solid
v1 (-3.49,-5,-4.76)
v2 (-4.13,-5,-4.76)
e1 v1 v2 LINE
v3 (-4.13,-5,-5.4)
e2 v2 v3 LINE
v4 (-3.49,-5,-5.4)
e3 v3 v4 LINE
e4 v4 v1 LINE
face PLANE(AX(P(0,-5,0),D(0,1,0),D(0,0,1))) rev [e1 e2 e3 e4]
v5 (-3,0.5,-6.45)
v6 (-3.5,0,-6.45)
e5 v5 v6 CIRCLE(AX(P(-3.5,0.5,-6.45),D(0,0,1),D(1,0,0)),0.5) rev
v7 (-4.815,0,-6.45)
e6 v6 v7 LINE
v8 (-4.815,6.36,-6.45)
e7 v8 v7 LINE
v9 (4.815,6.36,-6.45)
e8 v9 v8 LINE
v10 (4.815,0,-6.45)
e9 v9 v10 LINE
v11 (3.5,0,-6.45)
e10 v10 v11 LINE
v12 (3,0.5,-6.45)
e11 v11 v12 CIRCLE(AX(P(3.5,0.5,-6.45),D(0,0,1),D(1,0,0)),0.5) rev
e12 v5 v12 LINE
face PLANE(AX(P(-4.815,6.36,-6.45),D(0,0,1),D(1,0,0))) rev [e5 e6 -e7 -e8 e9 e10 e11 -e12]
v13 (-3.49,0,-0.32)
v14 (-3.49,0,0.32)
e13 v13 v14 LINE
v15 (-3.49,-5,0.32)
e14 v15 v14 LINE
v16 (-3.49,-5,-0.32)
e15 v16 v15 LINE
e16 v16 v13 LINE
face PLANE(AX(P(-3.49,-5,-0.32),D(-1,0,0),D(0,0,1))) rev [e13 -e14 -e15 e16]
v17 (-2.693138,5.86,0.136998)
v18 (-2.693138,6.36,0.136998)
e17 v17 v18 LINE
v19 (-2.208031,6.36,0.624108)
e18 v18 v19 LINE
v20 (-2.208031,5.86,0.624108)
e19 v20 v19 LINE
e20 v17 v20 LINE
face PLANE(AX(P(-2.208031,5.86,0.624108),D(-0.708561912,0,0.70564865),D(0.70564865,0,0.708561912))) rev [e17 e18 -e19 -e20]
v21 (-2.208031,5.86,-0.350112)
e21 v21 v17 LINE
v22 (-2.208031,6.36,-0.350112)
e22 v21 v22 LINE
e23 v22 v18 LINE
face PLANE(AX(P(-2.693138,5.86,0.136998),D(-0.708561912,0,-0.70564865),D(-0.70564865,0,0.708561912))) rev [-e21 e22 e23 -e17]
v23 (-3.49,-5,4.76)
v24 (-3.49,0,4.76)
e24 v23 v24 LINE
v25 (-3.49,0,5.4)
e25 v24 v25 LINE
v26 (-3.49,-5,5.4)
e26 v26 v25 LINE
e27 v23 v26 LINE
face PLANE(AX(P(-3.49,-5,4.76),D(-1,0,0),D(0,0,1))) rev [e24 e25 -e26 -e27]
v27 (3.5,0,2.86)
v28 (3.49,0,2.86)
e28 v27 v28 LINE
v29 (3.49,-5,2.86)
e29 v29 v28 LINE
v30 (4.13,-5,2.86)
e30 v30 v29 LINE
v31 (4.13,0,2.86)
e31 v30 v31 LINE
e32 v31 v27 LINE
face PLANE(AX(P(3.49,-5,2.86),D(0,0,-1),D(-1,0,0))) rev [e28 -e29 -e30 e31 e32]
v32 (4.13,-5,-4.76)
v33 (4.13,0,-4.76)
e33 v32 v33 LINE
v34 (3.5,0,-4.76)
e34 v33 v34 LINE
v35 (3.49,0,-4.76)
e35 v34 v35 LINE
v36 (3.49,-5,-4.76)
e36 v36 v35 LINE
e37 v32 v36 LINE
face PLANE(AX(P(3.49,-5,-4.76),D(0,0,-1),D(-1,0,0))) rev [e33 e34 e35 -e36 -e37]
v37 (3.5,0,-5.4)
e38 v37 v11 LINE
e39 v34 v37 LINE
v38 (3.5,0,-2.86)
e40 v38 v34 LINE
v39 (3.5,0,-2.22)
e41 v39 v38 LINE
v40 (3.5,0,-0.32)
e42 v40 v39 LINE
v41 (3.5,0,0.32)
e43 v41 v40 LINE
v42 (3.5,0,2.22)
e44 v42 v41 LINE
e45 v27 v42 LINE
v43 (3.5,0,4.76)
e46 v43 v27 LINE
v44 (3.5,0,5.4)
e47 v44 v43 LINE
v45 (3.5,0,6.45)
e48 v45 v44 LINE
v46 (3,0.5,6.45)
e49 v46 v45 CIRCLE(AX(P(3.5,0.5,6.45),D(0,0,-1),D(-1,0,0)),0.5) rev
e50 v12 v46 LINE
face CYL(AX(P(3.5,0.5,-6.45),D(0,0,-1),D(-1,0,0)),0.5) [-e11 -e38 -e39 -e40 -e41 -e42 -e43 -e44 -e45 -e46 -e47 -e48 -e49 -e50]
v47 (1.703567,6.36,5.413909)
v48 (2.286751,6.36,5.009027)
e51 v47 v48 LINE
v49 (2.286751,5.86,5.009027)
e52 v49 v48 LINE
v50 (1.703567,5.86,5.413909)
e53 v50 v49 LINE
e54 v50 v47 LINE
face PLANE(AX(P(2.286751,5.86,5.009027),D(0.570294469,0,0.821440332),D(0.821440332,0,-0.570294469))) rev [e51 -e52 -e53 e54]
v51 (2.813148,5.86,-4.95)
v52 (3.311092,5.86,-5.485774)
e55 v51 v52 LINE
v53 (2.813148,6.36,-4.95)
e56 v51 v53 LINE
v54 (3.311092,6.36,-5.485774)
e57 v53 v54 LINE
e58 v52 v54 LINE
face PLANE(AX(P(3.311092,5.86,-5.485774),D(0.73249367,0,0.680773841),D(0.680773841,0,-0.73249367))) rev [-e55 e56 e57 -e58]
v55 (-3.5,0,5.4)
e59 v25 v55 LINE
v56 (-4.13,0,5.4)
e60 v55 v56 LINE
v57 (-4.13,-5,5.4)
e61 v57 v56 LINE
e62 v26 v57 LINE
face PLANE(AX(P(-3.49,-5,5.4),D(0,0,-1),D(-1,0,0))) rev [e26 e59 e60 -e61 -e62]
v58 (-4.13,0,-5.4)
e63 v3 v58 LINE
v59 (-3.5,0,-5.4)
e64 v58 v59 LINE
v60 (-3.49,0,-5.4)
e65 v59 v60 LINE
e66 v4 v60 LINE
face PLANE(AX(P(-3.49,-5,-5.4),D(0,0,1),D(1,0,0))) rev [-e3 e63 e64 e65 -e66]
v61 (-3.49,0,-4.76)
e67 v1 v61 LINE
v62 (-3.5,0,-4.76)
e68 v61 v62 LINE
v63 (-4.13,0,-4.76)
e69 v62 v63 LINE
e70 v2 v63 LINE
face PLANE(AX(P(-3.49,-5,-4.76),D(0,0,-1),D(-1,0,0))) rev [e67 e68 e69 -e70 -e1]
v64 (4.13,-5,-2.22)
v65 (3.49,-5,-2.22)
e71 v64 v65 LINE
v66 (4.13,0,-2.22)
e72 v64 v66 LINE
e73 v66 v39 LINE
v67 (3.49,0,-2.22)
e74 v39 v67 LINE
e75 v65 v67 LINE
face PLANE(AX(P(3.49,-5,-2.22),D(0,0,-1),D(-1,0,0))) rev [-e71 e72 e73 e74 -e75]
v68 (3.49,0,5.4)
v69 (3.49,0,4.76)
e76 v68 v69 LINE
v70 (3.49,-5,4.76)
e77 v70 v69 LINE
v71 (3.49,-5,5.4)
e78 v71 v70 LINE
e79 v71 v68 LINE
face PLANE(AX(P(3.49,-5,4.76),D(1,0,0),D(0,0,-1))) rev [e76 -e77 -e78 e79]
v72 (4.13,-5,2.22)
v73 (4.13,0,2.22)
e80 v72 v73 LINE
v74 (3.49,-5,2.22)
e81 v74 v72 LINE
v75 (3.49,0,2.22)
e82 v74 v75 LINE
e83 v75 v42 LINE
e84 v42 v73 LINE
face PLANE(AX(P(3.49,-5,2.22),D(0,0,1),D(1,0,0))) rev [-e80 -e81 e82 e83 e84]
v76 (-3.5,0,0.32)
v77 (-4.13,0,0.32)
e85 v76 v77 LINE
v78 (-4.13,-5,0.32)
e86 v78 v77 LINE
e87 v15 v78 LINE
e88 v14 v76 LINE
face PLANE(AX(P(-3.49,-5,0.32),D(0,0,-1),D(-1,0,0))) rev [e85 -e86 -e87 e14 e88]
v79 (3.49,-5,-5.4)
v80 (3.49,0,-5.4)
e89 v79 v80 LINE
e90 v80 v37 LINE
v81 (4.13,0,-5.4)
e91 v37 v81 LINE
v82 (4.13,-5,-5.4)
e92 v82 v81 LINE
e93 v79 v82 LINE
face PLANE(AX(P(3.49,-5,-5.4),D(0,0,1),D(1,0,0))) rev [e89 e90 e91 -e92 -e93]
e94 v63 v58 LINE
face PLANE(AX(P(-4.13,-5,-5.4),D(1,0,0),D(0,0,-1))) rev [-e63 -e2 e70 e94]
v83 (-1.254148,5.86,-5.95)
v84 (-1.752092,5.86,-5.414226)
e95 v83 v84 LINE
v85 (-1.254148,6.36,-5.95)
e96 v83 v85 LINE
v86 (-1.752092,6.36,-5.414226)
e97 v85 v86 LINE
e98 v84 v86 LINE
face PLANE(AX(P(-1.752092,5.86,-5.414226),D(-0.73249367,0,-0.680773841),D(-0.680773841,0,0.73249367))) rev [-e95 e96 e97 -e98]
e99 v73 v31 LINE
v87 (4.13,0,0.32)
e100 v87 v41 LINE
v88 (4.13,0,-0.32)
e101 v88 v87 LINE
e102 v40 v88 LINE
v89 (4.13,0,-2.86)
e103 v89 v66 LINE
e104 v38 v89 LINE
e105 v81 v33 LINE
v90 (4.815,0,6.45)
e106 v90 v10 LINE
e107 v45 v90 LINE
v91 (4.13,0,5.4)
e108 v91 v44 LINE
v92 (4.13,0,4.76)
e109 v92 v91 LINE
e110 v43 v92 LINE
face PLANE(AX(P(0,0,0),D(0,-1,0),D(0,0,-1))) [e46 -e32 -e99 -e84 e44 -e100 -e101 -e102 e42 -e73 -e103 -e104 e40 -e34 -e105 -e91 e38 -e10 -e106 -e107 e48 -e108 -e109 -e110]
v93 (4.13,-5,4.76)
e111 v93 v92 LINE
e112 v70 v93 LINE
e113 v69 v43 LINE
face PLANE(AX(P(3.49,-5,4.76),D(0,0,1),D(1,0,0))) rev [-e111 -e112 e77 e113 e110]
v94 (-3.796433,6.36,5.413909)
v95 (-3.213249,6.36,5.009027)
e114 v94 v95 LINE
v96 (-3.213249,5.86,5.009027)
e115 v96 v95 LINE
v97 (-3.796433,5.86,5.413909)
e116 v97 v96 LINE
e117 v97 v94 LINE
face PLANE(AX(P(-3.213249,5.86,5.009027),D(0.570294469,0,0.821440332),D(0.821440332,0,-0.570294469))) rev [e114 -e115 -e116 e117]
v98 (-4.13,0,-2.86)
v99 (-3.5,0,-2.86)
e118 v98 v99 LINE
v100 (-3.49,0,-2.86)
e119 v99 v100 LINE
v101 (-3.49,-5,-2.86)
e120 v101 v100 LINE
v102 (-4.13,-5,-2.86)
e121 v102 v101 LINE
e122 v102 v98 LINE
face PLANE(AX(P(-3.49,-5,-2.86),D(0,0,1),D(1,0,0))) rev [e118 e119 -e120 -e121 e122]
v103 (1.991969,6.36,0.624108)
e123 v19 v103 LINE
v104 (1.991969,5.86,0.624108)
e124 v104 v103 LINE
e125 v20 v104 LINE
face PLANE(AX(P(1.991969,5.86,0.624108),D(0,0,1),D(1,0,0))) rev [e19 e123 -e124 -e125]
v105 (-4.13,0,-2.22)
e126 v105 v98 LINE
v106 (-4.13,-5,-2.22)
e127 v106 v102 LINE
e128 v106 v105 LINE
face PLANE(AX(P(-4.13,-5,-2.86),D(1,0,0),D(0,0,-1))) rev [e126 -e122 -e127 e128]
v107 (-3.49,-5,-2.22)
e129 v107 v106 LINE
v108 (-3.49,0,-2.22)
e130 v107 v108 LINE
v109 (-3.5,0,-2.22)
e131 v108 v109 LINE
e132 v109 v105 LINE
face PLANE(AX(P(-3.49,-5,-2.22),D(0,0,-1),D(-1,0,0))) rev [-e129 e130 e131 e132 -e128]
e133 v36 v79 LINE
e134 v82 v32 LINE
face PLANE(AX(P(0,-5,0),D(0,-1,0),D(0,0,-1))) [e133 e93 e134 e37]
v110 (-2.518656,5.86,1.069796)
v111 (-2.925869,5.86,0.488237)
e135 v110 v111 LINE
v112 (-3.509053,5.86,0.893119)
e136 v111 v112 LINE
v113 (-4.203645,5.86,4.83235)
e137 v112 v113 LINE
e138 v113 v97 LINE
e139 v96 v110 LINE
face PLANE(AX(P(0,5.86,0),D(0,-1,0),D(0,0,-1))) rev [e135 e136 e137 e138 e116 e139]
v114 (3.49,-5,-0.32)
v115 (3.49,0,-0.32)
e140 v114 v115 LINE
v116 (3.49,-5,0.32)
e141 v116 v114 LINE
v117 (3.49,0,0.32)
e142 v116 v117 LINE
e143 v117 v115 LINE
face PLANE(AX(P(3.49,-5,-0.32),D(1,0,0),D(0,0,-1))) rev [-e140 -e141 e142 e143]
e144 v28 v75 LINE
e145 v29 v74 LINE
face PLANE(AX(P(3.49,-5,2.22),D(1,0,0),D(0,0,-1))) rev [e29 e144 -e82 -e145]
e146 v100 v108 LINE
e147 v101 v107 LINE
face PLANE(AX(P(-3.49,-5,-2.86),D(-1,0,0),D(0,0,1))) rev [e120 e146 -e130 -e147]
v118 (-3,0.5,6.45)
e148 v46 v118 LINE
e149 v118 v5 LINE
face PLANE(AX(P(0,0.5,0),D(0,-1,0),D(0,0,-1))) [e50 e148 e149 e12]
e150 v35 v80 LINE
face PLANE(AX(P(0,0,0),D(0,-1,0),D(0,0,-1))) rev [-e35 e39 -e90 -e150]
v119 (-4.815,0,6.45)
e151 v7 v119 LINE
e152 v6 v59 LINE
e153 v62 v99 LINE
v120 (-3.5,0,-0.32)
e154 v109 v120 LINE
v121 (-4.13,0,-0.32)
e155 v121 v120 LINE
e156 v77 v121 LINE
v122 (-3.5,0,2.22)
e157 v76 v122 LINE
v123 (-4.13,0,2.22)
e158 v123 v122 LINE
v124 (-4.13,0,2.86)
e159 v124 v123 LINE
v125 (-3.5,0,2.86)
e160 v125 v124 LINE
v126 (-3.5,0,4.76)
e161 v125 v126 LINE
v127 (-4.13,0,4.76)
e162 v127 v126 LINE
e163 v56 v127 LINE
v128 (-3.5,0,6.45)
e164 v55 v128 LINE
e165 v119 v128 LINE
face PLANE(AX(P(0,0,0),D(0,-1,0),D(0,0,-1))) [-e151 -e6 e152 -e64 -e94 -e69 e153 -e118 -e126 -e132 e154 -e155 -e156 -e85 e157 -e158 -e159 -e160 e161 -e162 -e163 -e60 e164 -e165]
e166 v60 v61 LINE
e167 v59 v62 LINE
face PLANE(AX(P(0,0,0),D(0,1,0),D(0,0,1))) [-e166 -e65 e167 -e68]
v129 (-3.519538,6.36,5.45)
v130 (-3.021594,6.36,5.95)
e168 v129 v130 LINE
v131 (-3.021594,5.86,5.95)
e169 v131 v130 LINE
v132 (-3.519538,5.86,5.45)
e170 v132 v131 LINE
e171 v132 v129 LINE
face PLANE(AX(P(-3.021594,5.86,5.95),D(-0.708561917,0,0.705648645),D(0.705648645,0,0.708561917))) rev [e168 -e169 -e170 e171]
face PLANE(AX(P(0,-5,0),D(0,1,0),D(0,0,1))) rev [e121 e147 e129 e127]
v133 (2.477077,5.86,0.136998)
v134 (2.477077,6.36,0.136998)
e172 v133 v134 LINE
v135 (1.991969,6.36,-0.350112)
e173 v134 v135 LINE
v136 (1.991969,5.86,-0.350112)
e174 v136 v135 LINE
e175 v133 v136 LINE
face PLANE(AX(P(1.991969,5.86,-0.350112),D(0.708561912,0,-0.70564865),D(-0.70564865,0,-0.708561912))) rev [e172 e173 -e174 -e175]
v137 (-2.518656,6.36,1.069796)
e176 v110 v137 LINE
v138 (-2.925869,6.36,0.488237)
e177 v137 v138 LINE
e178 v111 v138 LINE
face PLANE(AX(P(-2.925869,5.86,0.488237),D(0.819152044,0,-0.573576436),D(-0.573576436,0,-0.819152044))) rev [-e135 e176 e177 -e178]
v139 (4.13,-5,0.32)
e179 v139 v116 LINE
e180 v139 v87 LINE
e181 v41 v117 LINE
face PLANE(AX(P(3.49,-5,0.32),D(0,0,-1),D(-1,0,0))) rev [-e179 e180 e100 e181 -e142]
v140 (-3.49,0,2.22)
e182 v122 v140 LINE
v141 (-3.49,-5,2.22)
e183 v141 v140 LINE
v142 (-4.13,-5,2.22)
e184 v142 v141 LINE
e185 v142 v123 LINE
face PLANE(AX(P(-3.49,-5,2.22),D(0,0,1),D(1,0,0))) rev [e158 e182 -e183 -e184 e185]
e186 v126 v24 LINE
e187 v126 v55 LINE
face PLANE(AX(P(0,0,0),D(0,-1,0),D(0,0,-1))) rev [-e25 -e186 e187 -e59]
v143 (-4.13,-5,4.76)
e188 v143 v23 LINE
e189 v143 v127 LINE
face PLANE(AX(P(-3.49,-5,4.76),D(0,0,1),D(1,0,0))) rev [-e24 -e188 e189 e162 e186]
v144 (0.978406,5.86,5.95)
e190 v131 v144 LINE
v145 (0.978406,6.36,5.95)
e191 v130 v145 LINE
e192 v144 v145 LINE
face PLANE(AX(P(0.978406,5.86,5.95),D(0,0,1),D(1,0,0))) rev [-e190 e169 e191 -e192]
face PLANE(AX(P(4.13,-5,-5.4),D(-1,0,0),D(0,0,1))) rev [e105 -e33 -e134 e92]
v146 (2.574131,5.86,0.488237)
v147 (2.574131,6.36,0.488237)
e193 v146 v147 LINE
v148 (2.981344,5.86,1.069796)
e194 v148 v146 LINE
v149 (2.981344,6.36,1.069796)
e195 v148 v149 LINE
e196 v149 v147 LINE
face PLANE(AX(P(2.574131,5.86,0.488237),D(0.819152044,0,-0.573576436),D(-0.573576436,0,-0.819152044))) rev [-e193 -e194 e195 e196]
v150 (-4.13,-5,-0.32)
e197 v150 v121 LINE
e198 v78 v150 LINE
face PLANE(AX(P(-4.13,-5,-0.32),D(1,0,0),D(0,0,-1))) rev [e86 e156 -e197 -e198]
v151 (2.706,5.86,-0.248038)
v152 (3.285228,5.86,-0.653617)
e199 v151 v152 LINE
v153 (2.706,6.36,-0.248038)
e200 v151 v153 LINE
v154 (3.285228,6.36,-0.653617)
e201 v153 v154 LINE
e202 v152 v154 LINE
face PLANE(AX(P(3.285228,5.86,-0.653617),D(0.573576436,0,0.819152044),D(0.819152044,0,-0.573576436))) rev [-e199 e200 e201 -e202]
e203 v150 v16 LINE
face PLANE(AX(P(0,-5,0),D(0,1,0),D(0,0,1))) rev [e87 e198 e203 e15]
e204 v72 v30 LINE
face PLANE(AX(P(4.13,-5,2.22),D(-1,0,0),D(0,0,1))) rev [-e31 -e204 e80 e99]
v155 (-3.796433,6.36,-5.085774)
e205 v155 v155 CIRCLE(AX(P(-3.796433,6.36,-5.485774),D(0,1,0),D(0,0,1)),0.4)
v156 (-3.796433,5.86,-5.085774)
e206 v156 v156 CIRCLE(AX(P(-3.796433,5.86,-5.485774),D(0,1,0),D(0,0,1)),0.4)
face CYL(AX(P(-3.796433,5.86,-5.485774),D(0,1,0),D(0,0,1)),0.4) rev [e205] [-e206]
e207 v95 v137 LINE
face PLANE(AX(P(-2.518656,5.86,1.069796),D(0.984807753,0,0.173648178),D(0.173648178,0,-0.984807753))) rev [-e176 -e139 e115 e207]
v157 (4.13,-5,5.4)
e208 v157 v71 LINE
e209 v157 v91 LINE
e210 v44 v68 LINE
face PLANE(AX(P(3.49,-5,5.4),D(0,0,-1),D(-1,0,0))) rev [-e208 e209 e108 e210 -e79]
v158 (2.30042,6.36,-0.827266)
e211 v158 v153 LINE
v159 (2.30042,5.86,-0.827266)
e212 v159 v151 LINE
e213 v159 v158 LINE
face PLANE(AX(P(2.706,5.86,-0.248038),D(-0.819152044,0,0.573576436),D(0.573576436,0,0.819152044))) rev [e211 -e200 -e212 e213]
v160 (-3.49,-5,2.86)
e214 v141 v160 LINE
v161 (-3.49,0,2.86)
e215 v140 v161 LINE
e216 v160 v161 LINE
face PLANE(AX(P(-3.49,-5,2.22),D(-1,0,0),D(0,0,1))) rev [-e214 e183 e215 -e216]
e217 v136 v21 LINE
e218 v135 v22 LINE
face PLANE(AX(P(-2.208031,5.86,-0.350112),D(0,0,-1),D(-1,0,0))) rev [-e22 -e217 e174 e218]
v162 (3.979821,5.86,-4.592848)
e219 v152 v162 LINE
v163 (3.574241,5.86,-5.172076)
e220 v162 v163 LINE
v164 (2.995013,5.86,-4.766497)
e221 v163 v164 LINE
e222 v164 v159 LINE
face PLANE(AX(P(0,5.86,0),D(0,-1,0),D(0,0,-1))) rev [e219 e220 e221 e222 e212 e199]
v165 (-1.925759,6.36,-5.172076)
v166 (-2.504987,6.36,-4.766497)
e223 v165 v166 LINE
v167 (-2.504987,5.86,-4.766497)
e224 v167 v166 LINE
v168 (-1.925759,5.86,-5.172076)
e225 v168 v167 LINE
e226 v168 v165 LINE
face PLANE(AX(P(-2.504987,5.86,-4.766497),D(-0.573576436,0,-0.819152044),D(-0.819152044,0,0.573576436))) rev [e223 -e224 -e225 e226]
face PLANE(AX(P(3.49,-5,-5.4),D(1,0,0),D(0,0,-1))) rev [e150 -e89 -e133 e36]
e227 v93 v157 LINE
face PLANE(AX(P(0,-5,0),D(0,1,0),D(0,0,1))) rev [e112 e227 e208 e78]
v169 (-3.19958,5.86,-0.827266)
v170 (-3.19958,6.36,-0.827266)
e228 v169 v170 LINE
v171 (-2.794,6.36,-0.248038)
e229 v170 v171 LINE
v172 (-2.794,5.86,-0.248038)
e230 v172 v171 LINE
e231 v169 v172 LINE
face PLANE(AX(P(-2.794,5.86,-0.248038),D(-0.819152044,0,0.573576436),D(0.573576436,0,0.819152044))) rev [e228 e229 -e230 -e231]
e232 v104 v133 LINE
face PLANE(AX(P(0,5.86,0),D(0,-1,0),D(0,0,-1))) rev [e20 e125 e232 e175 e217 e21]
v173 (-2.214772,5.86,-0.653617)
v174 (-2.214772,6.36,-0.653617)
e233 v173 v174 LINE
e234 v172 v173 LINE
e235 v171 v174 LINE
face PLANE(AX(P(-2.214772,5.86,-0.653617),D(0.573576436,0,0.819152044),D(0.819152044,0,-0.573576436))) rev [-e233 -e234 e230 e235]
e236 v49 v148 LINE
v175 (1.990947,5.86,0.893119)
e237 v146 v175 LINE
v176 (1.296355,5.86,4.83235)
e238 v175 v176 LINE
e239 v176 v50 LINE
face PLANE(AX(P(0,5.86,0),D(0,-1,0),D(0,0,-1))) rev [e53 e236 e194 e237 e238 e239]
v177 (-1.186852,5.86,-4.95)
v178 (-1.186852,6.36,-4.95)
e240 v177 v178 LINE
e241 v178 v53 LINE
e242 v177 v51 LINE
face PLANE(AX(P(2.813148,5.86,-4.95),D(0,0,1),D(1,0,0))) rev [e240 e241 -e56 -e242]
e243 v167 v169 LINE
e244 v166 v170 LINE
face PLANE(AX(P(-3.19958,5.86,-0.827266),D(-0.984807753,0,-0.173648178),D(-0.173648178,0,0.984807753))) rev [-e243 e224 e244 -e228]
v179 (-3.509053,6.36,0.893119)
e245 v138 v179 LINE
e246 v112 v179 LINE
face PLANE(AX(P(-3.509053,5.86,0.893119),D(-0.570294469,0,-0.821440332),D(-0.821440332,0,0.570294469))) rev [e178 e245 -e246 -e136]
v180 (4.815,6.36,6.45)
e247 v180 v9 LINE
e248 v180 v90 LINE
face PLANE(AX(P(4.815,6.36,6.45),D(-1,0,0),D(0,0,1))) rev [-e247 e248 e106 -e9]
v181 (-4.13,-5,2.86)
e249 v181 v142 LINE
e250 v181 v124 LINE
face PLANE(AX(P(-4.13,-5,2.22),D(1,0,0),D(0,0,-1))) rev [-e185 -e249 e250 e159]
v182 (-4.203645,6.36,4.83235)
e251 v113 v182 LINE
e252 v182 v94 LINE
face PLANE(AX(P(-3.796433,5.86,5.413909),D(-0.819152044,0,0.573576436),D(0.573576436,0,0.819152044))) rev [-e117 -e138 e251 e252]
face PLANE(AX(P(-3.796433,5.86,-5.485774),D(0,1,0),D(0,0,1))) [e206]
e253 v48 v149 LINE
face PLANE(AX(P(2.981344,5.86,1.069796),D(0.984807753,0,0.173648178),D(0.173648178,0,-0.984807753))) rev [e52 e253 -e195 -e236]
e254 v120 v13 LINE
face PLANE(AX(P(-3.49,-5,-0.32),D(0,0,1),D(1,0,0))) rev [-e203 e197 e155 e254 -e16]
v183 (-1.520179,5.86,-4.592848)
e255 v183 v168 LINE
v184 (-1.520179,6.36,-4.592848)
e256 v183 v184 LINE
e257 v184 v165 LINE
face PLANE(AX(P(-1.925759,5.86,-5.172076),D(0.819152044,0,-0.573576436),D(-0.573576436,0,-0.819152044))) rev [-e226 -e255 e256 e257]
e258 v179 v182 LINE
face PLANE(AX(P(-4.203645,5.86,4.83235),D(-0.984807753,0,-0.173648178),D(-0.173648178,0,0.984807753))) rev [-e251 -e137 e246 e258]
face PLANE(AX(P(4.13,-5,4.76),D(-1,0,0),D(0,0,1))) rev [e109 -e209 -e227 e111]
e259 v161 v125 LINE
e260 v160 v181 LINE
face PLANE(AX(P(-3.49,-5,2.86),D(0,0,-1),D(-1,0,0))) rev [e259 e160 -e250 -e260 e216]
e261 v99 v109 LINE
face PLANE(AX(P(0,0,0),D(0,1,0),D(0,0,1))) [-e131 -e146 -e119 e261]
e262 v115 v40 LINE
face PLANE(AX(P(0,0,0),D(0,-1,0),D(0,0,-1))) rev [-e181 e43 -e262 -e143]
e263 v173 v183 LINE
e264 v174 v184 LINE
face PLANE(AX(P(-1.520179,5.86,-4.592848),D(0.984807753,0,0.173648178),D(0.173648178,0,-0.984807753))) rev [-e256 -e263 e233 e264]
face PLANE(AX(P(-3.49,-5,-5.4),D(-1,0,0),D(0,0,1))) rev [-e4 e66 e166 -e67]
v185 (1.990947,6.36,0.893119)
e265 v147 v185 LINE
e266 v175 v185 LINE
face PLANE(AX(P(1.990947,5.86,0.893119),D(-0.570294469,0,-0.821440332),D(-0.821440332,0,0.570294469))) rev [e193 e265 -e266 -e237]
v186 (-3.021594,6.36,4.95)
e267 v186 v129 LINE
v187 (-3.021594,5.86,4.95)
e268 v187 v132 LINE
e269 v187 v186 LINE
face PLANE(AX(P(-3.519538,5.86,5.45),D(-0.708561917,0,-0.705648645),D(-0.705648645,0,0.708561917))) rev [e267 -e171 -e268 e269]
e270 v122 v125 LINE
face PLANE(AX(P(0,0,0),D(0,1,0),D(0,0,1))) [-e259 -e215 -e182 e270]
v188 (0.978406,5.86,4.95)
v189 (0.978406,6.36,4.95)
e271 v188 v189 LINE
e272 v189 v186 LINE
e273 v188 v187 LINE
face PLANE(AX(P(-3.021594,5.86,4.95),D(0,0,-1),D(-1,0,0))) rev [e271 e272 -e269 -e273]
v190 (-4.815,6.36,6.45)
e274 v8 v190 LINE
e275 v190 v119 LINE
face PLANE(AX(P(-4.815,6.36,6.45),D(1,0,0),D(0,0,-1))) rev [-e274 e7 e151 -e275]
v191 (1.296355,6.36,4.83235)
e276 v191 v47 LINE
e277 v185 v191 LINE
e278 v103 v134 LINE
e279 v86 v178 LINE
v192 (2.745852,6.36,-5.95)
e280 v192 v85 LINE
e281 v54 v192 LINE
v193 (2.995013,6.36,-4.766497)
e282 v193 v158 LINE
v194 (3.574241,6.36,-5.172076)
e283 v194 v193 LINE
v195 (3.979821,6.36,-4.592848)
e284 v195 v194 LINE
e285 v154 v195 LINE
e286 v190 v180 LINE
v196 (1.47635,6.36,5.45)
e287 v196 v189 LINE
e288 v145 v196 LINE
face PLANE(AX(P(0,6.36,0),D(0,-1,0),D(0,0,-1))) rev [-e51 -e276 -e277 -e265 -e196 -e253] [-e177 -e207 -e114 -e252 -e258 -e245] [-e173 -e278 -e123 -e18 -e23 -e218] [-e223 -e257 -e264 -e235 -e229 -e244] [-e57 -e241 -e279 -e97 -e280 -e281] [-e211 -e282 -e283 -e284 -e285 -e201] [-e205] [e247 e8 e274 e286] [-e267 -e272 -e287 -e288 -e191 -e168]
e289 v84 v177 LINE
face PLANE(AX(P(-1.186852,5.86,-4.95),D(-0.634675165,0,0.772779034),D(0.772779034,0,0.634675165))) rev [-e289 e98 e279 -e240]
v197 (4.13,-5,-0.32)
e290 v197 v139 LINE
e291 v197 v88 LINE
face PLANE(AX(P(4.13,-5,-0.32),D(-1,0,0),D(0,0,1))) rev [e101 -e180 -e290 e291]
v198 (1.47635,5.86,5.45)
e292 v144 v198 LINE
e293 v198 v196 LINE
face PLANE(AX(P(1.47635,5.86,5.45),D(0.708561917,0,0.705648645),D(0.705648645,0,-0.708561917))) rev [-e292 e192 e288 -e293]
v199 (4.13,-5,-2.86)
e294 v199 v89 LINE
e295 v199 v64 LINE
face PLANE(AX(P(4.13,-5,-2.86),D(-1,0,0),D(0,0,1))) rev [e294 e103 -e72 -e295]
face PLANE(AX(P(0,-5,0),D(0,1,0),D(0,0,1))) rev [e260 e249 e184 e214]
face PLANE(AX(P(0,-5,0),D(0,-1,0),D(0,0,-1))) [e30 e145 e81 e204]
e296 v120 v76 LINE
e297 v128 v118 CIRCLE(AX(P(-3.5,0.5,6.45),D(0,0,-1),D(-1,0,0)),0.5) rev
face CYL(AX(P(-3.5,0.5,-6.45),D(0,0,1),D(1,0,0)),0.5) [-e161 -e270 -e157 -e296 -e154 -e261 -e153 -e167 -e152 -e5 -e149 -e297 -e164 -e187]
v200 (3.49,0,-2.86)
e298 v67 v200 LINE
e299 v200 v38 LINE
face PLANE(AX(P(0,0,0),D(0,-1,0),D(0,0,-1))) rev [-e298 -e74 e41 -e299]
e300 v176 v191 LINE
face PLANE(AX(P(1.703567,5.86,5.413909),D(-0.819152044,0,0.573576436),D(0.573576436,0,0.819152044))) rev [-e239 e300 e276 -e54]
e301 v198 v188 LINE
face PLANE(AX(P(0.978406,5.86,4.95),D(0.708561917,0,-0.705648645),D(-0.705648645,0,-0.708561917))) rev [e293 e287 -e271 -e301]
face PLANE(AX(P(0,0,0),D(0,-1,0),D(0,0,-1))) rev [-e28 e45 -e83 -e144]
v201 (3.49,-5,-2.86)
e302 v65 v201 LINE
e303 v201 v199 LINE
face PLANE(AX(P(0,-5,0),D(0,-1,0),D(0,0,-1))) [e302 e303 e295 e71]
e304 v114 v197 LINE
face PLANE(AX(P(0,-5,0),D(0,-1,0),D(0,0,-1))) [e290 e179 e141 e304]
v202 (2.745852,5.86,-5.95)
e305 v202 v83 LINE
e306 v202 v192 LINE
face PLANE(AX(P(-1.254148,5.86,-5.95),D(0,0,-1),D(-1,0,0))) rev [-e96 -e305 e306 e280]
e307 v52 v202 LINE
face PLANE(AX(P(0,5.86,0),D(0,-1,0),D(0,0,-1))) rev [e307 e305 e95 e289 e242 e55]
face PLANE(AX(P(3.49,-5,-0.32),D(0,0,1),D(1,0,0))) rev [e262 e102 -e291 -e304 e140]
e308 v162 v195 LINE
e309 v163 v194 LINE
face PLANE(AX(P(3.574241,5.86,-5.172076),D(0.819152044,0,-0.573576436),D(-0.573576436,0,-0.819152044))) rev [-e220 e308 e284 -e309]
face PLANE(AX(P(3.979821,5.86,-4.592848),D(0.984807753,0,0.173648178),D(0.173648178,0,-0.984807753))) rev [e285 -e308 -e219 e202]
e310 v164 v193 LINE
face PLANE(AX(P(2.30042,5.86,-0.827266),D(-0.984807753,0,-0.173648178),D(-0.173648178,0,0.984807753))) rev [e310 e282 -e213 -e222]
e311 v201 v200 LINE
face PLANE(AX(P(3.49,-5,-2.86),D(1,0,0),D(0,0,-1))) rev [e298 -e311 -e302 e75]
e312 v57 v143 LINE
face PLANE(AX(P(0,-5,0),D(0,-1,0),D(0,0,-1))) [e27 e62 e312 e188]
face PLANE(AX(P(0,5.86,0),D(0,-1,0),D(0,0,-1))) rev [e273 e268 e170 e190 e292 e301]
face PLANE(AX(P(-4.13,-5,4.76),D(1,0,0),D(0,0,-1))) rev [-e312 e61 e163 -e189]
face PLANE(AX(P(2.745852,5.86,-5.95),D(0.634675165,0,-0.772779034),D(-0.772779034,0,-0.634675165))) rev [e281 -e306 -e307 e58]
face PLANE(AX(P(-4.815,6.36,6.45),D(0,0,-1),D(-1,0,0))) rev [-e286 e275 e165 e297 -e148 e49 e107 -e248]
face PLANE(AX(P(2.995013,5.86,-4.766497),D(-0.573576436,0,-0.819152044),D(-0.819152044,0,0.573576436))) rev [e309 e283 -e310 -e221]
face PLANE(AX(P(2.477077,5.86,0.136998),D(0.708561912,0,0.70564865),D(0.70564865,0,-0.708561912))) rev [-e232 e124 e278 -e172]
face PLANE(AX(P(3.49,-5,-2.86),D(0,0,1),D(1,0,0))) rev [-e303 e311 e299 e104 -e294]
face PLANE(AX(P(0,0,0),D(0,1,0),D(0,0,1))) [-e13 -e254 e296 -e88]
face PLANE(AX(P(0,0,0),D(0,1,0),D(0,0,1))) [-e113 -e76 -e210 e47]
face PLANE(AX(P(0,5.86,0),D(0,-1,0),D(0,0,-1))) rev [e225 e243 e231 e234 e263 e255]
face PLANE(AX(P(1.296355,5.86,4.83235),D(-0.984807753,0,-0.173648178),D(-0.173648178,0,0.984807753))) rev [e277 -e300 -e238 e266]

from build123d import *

# Parameters (mm, degrees)
SKETCH1_W           = 9.63
SKETCH1_H           = 12.9
BOSS_EXTRUDE1_DEPTH = 6.36
SKETCH2_W           = 6
SKETCH2_H           = 12.9
CUT_EXTRUDE1_DEPTH  = 0.5
FILLET1_R           = 0.5
SKETCH3_W           = 0.64
SKETCH3_H           = 0.64
BOSS_EXTRUDE2_DEPTH = 5
SKETCH4_R           = 0.4
CUT_EXTRUDE2_DEPTH  = 0.5


with BuildPart() as part:
    # Sketch1 → Boss-Extrude1 (new body)
    with BuildSketch(Plane(origin=(0, 0, 0), x_dir=(1, 0, 0), z_dir=(0, 1, 0))):
        Rectangle(SKETCH1_W, SKETCH1_H)
    extrude(amount=BOSS_EXTRUDE1_DEPTH)

    # Sketch2 → Cut-Extrude1 (cut)
    with BuildSketch(Plane.XZ):
        Rectangle(SKETCH2_W, SKETCH2_H)
    extrude(amount=-CUT_EXTRUDE1_DEPTH, mode=Mode.SUBTRACT)

    # Fillet1
    fillet1_edges = [part.edges().sort_by_distance(p)[0] for p in [
        (3, 0, 0),
        (-3, 0, 0),
    ]]
    fillet(fillet1_edges, radius=FILLET1_R - 0.0001)  # a hair under: the kernel refuses the full size

    # Sketch3 → Boss-Extrude2 (add)
    with BuildSketch(Plane.XZ):
        with Locations((-3.81, 2.54)):
            Rectangle(SKETCH3_W, SKETCH3_H)
        with Locations((-3.81, 5.08)):
            Rectangle(SKETCH3_W, SKETCH3_H)
        with Locations((-3.81, 0)):
            Rectangle(SKETCH3_W, SKETCH3_H)
        with Locations((-3.81, -2.54)):
            Rectangle(SKETCH3_W, SKETCH3_H)
        with Locations((-3.81, -5.08)):
            Rectangle(SKETCH3_W, SKETCH3_H)
        with Locations((3.81, 2.54)):
            Rectangle(SKETCH3_W, SKETCH3_H)
        with Locations((3.81, 5.08)):
            Rectangle(SKETCH3_W, SKETCH3_H)
        with Locations((3.81, 0)):
            Rectangle(SKETCH3_W, SKETCH3_H)
        with Locations((3.81, -2.54)):
            Rectangle(SKETCH3_W, SKETCH3_H)
        with Locations((3.81, -5.08)):
            Rectangle(SKETCH3_W, SKETCH3_H)
    extrude(amount=BOSS_EXTRUDE2_DEPTH)

    # Sketch4 → Cut-Extrude2 (cut)
    with BuildSketch(Plane(origin=(0, 6.36, 0), x_dir=(1, 0, 0), z_dir=(0, 1, 0))):
        with Locations(Location((-3.796432961, 5.485774113, 0), (0, 0, 270))):
            Circle(SKETCH4_R)
        Polygon((3.97982075, 4.592848347), (3.28522804, 0.653617335), (2.706000074, 0.248037547), (2.300420287, 0.827265513), (2.995012997, 4.766496525), (3.574240963, 5.172076312), align=None)
        Polygon((2.981343729, -1.069796233), (2.286751018, -5.009027245), (1.703567039, -5.41390948), (1.296354761, -4.832350077), (1.990947472, -0.893119065), (2.574131451, -0.48823683), align=None)
        Polygon((-3.021593907, -4.95), (0.978406093, -4.95), (1.476350329, -5.45), (0.978406093, -5.95), (-3.021593907, -5.95), (-3.519538144, -5.45), align=None)
        Polygon((-2.208030846, 0.350112276), (1.991969154, 0.350112276), (2.477076686, -0.136998017), (1.991969154, -0.62410831), (-2.208030846, -0.62410831), (-2.693138379, -0.136998017), align=None)
        Polygon((-1.254148002, 5.95), (2.745851998, 5.95), (3.31109238, 5.485774113), (2.813148144, 4.95), (-1.186851856, 4.95), (-1.752092238, 5.414225887), align=None)
        Polygon((-2.518656271, -1.069796233), (-3.213248982, -5.009027245), (-3.796432961, -5.41390948), (-4.203645239, -4.832350077), (-3.509052528, -0.893119065), (-2.925868549, -0.48823683), align=None)
        Polygon((-1.925759037, 5.172076312), (-1.52017925, 4.592848347), (-2.21477196, 0.653617335), (-2.793999926, 0.248037547), (-3.199579713, 0.827265513), (-2.504987003, 4.766496525), align=None)
    extrude(amount=-CUT_EXTRUDE2_DEPTH, mode=Mode.SUBTRACT)


solid = part.part
